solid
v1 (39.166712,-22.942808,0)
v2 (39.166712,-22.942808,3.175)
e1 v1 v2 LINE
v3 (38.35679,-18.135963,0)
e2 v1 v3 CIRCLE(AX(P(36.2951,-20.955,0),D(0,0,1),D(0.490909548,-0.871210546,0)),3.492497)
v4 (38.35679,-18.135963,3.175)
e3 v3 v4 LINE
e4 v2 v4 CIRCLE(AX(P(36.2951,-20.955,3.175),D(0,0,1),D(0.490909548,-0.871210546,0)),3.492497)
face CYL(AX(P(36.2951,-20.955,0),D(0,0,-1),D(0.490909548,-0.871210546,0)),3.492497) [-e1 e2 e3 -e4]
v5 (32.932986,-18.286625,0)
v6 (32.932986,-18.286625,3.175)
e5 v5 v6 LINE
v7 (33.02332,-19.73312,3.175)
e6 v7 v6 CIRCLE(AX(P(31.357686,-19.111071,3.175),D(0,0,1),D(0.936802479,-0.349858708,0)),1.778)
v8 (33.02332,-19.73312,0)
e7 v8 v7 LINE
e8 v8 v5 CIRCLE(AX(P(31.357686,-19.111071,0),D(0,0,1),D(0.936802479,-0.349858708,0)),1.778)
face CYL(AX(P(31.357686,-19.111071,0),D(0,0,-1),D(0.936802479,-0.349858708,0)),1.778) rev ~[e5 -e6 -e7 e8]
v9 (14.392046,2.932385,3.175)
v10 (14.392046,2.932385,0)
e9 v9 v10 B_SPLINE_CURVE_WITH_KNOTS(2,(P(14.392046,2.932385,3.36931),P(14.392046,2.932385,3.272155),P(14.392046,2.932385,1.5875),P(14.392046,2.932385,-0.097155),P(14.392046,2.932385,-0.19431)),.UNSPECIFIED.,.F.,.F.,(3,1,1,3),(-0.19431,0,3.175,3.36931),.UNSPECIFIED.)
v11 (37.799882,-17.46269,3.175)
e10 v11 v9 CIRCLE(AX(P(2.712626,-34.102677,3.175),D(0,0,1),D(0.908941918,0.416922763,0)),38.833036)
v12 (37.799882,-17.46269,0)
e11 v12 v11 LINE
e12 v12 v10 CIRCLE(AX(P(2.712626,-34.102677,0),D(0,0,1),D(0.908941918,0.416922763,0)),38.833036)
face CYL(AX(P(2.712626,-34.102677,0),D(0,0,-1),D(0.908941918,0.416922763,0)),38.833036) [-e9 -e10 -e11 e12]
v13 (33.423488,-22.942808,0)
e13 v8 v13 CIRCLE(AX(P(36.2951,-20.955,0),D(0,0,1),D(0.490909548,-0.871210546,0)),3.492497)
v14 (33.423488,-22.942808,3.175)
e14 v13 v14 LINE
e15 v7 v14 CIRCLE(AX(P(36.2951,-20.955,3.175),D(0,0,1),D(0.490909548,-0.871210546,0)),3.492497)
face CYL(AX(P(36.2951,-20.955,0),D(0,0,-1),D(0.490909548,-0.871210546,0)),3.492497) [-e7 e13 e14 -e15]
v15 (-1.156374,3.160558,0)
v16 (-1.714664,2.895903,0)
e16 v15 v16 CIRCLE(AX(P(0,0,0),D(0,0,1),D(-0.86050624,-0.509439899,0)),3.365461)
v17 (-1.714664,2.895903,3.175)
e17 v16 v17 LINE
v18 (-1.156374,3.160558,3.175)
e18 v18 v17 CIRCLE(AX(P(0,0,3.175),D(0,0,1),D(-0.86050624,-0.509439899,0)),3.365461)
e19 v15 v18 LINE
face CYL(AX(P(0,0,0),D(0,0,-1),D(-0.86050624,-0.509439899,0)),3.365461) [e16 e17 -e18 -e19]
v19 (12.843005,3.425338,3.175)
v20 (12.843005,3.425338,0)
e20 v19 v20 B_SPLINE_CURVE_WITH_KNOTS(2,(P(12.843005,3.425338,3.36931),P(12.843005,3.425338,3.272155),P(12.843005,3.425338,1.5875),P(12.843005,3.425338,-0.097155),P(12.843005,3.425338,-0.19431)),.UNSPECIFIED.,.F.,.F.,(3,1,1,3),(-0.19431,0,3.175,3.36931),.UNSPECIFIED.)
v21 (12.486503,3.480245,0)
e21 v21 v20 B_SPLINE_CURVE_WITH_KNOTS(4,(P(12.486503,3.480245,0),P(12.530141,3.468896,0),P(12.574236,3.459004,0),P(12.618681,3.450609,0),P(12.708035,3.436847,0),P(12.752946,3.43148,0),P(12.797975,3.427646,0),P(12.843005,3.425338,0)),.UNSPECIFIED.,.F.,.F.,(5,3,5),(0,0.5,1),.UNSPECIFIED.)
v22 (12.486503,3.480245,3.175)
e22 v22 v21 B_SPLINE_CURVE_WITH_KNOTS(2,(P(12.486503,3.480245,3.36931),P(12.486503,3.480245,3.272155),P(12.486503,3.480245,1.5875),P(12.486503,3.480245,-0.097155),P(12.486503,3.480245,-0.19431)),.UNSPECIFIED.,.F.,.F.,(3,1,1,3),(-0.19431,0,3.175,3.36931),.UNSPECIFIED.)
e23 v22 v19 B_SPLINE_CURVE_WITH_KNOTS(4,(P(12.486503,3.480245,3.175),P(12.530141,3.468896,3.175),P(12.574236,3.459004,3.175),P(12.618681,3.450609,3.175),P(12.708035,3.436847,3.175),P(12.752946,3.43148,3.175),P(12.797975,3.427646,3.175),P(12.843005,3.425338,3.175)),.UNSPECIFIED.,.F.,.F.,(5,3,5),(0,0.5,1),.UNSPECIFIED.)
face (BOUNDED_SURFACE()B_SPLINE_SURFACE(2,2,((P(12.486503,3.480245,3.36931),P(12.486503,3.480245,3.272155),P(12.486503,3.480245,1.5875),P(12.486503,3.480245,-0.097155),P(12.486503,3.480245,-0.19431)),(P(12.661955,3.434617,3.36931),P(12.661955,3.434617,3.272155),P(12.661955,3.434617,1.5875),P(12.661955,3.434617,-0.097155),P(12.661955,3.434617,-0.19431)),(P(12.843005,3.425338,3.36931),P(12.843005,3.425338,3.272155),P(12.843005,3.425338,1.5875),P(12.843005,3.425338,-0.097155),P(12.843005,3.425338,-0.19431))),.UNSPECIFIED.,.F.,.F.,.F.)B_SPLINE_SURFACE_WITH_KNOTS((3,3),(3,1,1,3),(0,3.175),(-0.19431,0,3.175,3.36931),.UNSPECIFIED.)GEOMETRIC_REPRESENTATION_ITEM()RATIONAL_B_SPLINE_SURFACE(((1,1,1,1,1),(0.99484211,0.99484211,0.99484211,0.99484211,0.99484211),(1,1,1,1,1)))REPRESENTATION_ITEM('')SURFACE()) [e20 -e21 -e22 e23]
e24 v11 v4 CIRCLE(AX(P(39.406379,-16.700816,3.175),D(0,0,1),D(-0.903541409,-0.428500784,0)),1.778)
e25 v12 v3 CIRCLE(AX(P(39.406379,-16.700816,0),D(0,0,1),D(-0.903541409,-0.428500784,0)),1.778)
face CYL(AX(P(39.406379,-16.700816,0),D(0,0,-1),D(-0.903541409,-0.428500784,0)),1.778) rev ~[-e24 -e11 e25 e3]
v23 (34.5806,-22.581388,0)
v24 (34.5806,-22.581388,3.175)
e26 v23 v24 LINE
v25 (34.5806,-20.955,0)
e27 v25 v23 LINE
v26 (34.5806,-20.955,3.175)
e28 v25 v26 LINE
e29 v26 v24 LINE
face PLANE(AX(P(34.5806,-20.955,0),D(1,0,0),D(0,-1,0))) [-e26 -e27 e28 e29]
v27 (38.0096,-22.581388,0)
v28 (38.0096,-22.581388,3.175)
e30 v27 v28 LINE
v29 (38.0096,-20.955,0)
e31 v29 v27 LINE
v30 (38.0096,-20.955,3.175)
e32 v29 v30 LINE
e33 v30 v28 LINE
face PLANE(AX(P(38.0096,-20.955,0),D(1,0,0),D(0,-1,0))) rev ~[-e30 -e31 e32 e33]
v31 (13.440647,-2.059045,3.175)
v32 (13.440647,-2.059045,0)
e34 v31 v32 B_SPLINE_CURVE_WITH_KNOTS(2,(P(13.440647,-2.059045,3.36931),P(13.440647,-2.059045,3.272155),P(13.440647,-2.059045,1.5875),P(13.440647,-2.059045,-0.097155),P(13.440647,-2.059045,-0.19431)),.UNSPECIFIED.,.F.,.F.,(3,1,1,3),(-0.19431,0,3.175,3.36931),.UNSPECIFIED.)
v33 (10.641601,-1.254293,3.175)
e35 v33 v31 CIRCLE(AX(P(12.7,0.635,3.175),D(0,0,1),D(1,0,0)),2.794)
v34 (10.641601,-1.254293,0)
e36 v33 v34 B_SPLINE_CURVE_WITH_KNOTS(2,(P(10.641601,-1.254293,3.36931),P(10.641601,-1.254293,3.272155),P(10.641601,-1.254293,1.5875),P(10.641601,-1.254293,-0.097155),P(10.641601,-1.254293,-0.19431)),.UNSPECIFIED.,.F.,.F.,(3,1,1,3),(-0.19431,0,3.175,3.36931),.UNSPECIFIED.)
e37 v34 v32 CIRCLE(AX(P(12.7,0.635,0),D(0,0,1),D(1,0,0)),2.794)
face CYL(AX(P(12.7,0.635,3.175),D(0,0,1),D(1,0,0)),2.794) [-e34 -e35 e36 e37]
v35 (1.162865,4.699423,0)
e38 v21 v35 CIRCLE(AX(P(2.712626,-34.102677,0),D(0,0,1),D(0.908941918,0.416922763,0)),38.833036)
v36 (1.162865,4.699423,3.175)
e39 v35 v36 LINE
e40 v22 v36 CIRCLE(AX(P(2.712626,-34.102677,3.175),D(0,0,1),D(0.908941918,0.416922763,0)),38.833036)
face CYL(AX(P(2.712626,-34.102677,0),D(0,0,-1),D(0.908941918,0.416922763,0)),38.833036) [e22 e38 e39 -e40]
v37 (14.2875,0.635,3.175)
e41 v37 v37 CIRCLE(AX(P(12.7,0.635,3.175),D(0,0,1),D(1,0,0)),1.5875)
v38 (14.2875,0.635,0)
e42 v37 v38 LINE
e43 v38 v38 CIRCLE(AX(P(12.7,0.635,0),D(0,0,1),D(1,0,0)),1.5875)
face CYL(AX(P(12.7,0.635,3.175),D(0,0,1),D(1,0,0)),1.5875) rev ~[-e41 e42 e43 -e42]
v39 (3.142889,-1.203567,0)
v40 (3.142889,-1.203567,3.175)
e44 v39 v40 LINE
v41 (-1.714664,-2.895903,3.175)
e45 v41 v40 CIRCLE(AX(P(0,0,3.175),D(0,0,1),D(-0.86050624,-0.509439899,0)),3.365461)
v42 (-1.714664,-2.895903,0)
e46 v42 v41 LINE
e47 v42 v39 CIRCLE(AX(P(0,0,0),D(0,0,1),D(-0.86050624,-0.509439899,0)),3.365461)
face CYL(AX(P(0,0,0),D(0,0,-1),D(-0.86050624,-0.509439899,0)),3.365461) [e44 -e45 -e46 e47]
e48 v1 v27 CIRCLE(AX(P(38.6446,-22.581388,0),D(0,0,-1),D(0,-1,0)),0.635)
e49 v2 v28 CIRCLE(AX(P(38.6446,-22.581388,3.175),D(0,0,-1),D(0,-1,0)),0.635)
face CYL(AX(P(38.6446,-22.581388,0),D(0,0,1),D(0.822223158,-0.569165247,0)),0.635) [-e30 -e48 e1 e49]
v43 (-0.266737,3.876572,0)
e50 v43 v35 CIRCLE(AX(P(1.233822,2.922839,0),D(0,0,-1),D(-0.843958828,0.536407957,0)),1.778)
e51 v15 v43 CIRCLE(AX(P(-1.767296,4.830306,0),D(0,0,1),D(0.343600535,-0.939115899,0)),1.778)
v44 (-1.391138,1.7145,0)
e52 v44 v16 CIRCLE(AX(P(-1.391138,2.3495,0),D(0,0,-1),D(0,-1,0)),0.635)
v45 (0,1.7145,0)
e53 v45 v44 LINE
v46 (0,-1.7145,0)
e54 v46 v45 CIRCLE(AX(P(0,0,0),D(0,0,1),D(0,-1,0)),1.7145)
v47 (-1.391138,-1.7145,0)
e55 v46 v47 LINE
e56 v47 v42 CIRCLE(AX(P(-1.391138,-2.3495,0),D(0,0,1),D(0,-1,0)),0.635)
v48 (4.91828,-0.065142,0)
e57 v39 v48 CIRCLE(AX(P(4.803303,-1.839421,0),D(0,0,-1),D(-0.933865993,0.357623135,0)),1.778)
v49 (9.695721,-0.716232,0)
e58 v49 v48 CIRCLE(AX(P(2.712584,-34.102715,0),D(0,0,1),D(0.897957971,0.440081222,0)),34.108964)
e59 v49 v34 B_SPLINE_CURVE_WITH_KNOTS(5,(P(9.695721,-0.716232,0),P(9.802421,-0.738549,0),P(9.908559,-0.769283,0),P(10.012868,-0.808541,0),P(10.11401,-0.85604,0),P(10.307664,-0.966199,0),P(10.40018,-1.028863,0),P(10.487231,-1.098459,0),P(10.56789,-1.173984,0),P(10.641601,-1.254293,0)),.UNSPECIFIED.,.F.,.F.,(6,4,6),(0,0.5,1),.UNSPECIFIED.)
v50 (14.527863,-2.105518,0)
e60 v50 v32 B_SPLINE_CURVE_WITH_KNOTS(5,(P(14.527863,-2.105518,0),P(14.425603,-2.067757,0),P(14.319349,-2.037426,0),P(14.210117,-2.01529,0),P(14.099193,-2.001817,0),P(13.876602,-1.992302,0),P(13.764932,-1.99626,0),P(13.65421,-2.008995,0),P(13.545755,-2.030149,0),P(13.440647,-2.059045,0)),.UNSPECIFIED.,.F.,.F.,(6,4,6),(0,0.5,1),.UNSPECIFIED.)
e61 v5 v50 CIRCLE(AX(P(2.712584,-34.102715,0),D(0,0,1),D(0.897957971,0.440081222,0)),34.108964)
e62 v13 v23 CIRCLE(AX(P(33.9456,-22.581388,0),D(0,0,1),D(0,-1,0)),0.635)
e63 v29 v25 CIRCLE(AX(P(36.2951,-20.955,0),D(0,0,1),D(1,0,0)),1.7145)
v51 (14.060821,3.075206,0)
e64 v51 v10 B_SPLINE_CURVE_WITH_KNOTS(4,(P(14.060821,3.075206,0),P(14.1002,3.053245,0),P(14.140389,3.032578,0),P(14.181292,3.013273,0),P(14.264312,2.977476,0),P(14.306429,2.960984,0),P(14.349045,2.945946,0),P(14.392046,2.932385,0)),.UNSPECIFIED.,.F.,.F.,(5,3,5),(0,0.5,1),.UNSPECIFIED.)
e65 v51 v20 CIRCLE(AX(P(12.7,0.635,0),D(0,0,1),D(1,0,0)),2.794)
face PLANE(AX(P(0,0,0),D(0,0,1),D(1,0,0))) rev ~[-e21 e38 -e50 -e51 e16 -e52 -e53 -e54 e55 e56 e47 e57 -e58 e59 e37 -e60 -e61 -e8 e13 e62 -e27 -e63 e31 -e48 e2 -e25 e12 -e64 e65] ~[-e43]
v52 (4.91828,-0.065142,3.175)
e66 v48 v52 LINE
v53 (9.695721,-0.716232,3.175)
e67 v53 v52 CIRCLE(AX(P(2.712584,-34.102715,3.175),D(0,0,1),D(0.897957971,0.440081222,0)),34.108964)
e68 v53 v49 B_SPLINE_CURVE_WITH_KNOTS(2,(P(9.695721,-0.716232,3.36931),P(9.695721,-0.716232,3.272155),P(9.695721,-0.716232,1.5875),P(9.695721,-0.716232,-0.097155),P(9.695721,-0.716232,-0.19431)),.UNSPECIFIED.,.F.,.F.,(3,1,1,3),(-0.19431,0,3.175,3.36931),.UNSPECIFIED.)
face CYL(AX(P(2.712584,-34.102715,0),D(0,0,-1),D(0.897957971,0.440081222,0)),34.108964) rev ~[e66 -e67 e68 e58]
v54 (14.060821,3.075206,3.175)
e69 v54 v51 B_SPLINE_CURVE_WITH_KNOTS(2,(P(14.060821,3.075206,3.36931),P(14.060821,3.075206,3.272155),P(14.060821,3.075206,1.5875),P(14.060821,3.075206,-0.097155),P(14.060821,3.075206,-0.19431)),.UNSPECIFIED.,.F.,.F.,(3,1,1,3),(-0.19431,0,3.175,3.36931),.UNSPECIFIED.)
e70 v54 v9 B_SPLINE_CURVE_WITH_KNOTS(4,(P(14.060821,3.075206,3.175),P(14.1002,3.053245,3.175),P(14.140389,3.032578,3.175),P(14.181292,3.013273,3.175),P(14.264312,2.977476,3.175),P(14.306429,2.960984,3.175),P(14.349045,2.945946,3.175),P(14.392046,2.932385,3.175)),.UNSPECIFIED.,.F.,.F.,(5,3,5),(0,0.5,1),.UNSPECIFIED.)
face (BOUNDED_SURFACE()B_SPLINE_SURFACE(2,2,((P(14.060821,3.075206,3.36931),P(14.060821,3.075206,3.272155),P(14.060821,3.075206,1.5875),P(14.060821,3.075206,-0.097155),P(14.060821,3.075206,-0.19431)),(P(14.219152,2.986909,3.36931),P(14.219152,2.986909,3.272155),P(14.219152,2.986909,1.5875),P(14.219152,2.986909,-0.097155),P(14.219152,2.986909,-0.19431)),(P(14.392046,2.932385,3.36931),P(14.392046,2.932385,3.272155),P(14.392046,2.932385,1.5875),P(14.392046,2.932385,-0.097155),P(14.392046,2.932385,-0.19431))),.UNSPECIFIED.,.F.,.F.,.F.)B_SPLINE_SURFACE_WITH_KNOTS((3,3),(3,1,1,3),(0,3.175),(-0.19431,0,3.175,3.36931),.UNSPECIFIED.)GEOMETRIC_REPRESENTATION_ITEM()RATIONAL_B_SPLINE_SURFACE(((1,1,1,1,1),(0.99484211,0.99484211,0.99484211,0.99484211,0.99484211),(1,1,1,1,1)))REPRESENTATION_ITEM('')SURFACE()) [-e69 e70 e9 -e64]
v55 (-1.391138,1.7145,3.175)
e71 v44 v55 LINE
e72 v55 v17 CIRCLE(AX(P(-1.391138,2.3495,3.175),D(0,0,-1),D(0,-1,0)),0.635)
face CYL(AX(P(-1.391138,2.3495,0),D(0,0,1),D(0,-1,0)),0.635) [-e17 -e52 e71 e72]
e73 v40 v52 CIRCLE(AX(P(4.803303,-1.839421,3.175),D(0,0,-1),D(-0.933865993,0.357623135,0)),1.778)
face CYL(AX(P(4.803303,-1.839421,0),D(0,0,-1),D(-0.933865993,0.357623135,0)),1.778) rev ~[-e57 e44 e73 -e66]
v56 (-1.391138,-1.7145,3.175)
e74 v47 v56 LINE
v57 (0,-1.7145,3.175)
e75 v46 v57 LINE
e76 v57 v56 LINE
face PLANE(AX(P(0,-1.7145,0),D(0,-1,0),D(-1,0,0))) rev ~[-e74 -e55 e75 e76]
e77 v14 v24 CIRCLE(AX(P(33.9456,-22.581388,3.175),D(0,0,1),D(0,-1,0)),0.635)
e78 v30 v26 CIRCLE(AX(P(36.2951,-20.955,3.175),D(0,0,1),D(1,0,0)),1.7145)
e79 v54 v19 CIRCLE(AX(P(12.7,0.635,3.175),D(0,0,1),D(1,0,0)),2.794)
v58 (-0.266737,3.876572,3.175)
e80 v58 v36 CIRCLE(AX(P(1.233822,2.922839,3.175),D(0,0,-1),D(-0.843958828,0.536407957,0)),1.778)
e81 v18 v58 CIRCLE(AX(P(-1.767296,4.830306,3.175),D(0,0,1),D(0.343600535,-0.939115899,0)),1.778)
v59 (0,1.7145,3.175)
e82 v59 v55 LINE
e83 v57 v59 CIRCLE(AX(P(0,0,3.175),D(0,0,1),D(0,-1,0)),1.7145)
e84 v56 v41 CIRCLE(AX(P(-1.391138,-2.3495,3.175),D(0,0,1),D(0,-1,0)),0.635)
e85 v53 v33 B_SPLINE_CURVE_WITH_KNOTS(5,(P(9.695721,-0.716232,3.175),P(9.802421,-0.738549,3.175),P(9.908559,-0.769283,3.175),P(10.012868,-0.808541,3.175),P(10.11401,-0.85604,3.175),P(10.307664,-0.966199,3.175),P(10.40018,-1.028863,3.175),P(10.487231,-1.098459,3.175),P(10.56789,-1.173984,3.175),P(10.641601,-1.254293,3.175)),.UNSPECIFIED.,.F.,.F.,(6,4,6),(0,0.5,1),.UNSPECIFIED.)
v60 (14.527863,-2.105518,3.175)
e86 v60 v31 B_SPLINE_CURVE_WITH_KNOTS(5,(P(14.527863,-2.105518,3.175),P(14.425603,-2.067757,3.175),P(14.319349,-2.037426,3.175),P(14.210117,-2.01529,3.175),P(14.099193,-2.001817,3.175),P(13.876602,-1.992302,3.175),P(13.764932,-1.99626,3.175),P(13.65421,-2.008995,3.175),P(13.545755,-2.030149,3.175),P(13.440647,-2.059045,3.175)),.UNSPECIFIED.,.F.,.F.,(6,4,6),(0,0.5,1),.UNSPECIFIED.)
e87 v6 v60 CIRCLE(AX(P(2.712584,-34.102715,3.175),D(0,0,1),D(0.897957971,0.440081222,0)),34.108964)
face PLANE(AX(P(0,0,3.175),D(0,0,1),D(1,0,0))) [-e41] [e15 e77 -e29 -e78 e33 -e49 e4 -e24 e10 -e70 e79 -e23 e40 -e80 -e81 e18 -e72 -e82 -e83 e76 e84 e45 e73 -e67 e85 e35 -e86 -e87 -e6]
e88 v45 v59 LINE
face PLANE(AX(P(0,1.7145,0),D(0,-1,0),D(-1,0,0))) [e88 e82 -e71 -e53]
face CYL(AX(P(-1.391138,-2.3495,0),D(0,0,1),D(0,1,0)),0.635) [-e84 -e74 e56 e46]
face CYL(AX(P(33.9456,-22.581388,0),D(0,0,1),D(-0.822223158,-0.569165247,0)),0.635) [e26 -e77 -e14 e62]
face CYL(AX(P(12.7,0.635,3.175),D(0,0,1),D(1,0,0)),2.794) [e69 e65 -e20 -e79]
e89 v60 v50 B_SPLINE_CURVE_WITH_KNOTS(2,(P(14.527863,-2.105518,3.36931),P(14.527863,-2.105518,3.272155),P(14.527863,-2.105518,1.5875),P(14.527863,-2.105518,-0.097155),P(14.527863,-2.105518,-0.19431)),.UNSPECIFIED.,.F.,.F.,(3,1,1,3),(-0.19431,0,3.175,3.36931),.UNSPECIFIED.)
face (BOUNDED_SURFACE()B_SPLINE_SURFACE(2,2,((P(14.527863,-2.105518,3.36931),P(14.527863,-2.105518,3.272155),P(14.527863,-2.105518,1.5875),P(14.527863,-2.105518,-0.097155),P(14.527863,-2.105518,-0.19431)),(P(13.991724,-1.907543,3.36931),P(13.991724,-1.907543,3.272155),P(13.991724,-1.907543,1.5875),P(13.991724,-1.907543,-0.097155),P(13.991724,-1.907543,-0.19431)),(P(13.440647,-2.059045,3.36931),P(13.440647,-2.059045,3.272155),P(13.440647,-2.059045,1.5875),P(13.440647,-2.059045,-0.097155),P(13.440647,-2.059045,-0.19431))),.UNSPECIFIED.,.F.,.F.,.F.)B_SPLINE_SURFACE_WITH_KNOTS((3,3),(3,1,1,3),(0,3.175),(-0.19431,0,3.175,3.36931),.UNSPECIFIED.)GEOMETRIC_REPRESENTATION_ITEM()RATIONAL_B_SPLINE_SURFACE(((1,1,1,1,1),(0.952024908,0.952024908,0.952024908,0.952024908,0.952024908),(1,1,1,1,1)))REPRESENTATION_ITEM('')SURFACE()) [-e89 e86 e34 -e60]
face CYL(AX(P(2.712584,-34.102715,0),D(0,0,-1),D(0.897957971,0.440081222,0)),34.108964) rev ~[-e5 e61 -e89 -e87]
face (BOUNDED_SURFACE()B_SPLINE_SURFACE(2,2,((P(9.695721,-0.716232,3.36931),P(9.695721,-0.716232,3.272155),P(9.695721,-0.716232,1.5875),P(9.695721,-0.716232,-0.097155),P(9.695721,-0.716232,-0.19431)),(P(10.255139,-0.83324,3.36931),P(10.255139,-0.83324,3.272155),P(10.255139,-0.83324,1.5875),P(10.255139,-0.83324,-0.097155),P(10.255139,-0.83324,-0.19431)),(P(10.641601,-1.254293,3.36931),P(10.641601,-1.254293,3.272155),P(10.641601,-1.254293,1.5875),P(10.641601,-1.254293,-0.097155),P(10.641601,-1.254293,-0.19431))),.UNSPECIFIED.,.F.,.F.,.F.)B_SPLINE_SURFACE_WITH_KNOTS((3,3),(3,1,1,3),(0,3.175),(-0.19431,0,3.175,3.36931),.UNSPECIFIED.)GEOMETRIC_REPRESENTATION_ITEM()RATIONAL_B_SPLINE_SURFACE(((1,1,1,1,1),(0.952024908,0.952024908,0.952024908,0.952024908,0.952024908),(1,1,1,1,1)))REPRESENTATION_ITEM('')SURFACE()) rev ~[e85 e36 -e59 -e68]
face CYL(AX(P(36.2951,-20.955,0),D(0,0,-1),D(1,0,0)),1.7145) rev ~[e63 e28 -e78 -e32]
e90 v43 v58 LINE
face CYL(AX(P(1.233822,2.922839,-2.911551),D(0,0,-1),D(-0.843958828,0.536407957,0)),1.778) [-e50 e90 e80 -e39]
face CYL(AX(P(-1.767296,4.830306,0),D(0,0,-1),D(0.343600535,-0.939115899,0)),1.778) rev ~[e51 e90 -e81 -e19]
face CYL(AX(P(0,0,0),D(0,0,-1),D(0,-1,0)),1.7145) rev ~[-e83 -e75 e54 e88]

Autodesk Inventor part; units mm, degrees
ref_plane "YZ Plane" through (0, 0, 0) normal (1, 0, 0) x (0, 1, 0)
ref_plane "XZ Plane" through (0, 0, 0) normal (0, 1, 0) x (-1, 0, 0)
ref_plane "XY Plane" through (0, 0, 0) normal (0, 0, 1) x (1, 0, 0)
sketch "Sketch1" plane through (0, 0, 0) normal (0, 0, 1) x (1, 0, 0)
  line L0 (0, 0) -> (69.8506, 0) construction
  circle A0 centre (0, -41.91) radius 47.625 construction
  arc A1 (0, -1.7145) -> (0, 1.7145) centre (0, 0) ccw
  arc A2 (-2.896, -1.7145) -> (-2.896, 1.7145) centre (0, 0) ccw
  line L1 (0, 3.3655) -> (0, 4.6355)
  arc A3 (38.0096, -20.955) -> (34.5806, -20.955) centre (36.2951, -20.955) ccw
  arc A4 (38.0096, -23.9977) -> (34.5806, -23.9977) centre (36.2951, -20.955) ccw
  arc A5 (38.0096, -17.9123) -> (0, 4.6355) centre (2.7126, -34.1027) ccw
  arc A6 (33.341, -19.092) -> (3.3655, 0) centre (2.7126, -34.1027) ccw
  line L2 (0, 1.7145) -> (-2.896, 1.7145)
  line L3 (0, -1.7145) -> (-2.896, -1.7145)
  line L4 (34.5806, -20.955) -> (34.5806, -23.9977)
  line L5 (38.0096, -20.955) -> (38.0096, -23.9977)
  dimension "d0" = 41.91
  dimension "d2" = 30
  dimension "d3" = 95.25
  dimension "d4" = 41.91
  dimension "d5" = 41.91
  dimension "d6" = 3.429
  dimension "d7" = 6.731
  dimension "d8" = 1.27
  dimension "d9" = 3.429
  dimension "d10" = 6.985
extrude "Extrusion1" add sketch "Sketch1" along normal blind 3.175
fillet "Fillet1" radius 0.635 4 edges at (-2.896, -1.7145, 1.5875) (-2.896, 1.7145, 1.5875) (34.5806, -23.9977, 1.5875) (38.0096, -23.9977, 1.5875)
fillet "Fillet2" radius 1.778 5 edges at (0, 3.3655, 1.5875) (0, 4.6355, 1.5875) (3.3655, 0, 1.5875) (33.341, -19.092, 1.5875) (38.0096, -17.9123, 1.5875)
sketch "Sketch2" plane through (0, 0, 3.175) normal (0, 0, 1) x (1, 0, 0)
  circle A0 centre (12.7, 0.635) radius 1.5875
  point P0 (0, 0)
  dimension "d15" = 3.175
  dimension "d16" = 12.7
  dimension "d17" = 0.635
extrude "Extrusion2" cut sketch "Sketch2" against normal through all
sketch "Sketch3" plane through (0, 0, 3.175) normal (0, 0, 1) x (1, 0, 0)
  circle A0 centre (12.7, 0.635) radius 1.5875 projected
  circle A1 centre (12.7, 0.635) radius 2.794
  point P0 (0, 0)
  dimension "d20" = 5.588
extrude "Extrusion3" add sketch "Sketch3" against normal blind 3.175
fillet "Fillet3" radius 1.778 4 edges at (14.1994, 2.9926, 1.5875) (12.6817, 3.4289, 1.5875) (13.9092, -1.8838, 1.5875) (10.3377, -0.857, 1.5875)
properties part number "HallEffectSpoolSensorMount3Brace" material "ABS Plastic"
